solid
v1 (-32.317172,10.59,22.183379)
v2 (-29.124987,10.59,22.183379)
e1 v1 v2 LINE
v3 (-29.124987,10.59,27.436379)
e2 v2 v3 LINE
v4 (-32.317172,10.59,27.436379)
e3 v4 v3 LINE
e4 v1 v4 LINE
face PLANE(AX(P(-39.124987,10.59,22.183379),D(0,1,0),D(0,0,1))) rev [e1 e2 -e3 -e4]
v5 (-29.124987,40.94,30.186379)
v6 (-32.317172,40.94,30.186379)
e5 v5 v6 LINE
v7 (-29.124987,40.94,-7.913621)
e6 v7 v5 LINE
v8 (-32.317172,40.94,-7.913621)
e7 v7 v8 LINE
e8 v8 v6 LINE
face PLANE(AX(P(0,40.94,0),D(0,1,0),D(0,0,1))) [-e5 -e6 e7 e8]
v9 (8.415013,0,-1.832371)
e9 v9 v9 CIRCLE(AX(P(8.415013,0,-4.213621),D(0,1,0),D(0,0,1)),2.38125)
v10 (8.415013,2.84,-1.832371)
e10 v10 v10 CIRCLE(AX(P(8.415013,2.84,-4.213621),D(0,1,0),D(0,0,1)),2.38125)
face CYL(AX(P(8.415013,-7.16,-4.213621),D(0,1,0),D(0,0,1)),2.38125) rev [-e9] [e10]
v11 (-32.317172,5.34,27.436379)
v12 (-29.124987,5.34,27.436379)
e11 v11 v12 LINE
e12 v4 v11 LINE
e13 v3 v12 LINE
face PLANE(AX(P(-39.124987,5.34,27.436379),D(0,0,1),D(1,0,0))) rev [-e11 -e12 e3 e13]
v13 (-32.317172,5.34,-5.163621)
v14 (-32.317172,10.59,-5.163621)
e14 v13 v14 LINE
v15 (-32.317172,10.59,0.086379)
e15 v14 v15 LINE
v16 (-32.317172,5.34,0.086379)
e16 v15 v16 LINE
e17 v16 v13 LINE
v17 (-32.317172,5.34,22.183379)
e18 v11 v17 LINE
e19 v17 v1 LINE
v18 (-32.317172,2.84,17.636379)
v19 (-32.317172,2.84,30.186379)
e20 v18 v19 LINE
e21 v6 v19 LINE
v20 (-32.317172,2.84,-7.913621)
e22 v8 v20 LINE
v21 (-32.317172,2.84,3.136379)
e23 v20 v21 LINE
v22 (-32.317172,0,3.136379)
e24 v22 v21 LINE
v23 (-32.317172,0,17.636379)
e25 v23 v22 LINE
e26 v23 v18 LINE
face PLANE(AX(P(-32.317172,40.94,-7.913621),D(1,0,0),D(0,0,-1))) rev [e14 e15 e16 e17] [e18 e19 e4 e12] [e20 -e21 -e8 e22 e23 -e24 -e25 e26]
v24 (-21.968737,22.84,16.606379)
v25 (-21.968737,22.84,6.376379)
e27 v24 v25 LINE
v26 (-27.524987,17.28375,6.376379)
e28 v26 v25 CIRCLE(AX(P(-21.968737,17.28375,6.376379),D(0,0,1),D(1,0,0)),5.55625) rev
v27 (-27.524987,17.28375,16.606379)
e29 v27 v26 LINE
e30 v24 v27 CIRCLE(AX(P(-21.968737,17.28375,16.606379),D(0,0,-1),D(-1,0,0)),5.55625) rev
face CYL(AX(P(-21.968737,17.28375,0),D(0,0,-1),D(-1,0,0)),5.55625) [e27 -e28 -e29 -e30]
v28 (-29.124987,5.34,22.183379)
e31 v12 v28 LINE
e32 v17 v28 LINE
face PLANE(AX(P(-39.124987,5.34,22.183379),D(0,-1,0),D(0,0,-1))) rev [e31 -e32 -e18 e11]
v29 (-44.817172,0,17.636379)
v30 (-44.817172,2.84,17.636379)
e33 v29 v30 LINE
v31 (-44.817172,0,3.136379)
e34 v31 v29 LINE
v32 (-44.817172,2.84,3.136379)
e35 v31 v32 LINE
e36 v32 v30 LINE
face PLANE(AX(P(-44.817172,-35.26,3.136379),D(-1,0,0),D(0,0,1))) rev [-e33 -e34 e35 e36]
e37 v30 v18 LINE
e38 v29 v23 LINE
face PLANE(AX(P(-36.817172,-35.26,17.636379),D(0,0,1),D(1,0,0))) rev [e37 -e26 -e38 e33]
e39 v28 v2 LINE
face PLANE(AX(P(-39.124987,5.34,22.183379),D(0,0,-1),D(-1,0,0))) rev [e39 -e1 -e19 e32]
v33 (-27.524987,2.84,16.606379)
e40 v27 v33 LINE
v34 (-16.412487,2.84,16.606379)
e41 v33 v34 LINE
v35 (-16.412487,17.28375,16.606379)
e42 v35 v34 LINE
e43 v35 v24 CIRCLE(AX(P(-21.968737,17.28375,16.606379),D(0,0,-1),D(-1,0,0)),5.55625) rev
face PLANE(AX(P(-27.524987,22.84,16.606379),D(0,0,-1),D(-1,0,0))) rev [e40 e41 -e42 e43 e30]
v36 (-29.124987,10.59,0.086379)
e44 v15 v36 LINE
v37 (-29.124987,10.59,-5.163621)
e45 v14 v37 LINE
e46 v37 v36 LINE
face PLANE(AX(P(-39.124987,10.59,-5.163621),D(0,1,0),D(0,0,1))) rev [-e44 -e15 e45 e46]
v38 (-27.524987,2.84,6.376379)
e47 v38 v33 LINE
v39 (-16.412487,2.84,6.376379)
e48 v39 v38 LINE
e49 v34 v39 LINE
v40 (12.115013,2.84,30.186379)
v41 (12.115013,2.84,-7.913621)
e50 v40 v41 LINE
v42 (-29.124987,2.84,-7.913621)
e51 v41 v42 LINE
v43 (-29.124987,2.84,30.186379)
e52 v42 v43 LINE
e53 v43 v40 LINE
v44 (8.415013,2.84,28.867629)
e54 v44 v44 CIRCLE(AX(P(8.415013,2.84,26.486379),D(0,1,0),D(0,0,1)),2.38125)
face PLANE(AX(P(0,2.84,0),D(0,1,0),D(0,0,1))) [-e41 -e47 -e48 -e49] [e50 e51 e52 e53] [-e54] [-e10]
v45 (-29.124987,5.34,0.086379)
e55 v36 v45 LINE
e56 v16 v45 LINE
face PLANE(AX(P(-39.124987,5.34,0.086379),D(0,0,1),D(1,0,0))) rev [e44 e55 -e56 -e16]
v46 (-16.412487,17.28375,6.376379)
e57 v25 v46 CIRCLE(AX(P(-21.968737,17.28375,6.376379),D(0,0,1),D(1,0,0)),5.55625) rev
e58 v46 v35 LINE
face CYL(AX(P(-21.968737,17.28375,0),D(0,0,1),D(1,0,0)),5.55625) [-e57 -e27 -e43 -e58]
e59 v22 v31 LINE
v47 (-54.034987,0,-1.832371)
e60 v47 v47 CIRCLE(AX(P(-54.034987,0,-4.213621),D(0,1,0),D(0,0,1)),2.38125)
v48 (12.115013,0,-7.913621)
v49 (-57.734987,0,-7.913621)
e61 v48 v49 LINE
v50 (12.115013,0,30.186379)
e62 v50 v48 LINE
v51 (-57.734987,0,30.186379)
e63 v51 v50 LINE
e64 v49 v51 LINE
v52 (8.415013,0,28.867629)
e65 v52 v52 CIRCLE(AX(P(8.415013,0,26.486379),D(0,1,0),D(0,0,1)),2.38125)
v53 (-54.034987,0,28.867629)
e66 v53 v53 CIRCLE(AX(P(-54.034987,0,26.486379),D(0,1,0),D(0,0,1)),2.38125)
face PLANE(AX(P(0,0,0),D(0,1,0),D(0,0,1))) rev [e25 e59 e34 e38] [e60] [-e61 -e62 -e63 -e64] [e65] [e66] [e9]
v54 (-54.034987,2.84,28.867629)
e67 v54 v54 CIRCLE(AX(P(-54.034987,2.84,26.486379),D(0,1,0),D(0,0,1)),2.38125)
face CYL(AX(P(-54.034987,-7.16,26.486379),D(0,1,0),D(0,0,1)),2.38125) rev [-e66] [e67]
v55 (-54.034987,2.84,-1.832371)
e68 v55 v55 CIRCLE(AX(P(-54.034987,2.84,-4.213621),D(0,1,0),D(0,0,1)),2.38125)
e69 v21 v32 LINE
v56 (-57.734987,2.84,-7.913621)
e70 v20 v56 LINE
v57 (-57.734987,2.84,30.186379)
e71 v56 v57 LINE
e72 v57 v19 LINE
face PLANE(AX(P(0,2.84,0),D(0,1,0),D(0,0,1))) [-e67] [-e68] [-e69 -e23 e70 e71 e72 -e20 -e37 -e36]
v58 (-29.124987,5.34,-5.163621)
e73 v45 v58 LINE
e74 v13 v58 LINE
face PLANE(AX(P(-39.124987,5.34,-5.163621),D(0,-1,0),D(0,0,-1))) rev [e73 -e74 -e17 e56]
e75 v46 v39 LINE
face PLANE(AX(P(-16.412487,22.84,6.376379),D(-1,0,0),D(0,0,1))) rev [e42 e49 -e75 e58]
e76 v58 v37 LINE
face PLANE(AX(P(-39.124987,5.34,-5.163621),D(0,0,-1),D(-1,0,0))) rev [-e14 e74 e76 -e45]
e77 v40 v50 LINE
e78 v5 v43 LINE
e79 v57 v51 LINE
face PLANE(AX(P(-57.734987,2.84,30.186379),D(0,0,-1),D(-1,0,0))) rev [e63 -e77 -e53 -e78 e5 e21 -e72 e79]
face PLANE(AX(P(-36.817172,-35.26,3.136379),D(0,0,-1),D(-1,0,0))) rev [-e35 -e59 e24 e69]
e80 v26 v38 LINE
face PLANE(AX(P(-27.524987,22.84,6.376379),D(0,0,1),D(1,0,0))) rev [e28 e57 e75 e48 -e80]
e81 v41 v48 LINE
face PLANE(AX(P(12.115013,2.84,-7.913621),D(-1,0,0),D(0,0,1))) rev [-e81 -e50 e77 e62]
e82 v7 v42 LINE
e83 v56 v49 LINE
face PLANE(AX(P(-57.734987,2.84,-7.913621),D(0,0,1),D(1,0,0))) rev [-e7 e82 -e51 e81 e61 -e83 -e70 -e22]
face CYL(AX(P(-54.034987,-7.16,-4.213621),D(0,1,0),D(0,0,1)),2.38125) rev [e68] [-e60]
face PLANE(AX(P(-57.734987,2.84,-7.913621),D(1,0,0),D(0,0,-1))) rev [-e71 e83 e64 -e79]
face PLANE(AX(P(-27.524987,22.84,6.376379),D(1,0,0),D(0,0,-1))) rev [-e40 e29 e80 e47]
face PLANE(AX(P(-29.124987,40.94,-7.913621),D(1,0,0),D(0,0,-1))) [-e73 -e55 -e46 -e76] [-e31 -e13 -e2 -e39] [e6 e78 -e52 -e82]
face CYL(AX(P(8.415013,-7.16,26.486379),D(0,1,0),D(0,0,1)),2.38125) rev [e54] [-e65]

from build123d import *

# Parameters (mm, degrees)
SKETCH1_W           = 69.85
SKETCH1_H           = 38.1
BOSS_EXTRUDE1_DEPTH = 2.84
SKETCH2_W           = 11.1125
SKETCH2_H           = 10.23
BOSS_EXTRUDE5_DEPTH = 20
SKETCH4_W           = 3.192184281
SKETCH4_H           = 38.1
BOSS_EXTRUDE7_DEPTH = 38.1
FILLET1_R           = 5.55625
FILLET2_R           = 5.55625
SKETCH5_W           = 8
SKETCH5_H           = 14.5
CUT_EXTRUDE1_DEPTH  = 38.1
SKETCH6_W           = 5.25
SKETCH6_H           = 5.25
CUT_EXTRUDE2_DEPTH  = 10
SKETCH7_W           = 5.253
SKETCH7_H           = 5.25
CUT_EXTRUDE3_DEPTH  = 10
SKETCH8_R           = 2.38125
CUT_EXTRUDE4_DEPTH  = 10
SKETCH9_R           = 2.38125
CUT_EXTRUDE5_DEPTH  = 10
SKETCH10_W          = 4.5
SKETCH10_H          = 14.5
CUT_EXTRUDE6_DEPTH  = 10
SKETCH12_R          = 2.38125
CUT_EXTRUDE7_DEPTH  = 10
SKETCH13_R          = 2.38125
CUT_EXTRUDE8_DEPTH  = 10


with BuildPart() as part:
    # Sketch1 → Boss-Extrude1 (new body)
    with BuildSketch(Plane(origin=(0, 0, 0), x_dir=(1, 0, 0), z_dir=(0, 1, 0))):
        with Locations((-22.809987281, -11.136378688)):
            Rectangle(SKETCH1_W, SKETCH1_H)
    extrude(amount=BOSS_EXTRUDE1_DEPTH)

    # Sketch2 → Boss-Extrude5 (add)
    with BuildSketch(Plane(origin=(0, 2.84, 0), x_dir=(1, 0, 0), z_dir=(0, 1, 0))):
        with Locations((-21.968737281, -11.491378688)):
            Rectangle(SKETCH2_W, SKETCH2_H)
    extrude(amount=BOSS_EXTRUDE5_DEPTH)

    # Sketch4 → Boss-Extrude7 (add)
    with BuildSketch(Plane(origin=(0, 2.84, 0), x_dir=(1, 0, 0), z_dir=(0, 1, 0))):
        with Locations((-30.721079422, -11.136378688)):
            Rectangle(SKETCH4_W, SKETCH4_H)
    extrude(amount=BOSS_EXTRUDE7_DEPTH)

    # Fillet1
    fillet1_edges = [part.edges().sort_by_distance(p)[0] for p in [
        (-16.412487281, 22.84, 11.491378688),
    ]]
    fillet(fillet1_edges, radius=FILLET1_R)

    # Fillet2
    fillet2_edges = [part.edges().sort_by_distance(p)[0] for p in [
        (-27.524987281, 22.84, 11.491378688),
    ]]
    fillet(fillet2_edges, radius=FILLET2_R - 0.0001)  # a hair under: the kernel refuses the full size

    # Sketch5 → Cut-Extrude1 (cut)
    with BuildSketch(Plane(origin=(0, 2.84, 0), x_dir=(1, 0, 0), z_dir=(0, 1, 0))):
        with Locations((-40.817171562, -10.386378688)):
            Rectangle(SKETCH5_W, SKETCH5_H)
    extrude(amount=-CUT_EXTRUDE1_DEPTH, mode=Mode.SUBTRACT)

    # Sketch6 → Cut-Extrude2 (cut)
    with BuildSketch(Plane(origin=(-29.124987281, 0, 0), x_dir=(0, 0, -1), z_dir=(1, 0, 0))):
        with Locations((2.538621312, 7.965)):
            Rectangle(SKETCH6_W, SKETCH6_H)
    extrude(amount=-CUT_EXTRUDE2_DEPTH, mode=Mode.SUBTRACT)

    # Sketch7 → Cut-Extrude3 (cut)
    with BuildSketch(Plane(origin=(-29.124987281, 0, 0), x_dir=(0, 0, -1), z_dir=(1, 0, 0))):
        with Locations((-24.809878688, 7.965)):
            Rectangle(SKETCH7_W, SKETCH7_H)
    extrude(amount=-CUT_EXTRUDE3_DEPTH, mode=Mode.SUBTRACT)

    # Sketch8 → Cut-Extrude4 (cut)
    with BuildSketch(Plane(origin=(0, 2.84, 0), x_dir=(1, 0, 0), z_dir=(0, 1, 0))):
        with Locations(Location((8.415012719, 4.213621312, 0), (0, 0, 270))):
            Circle(SKETCH8_R)
    extrude(amount=-CUT_EXTRUDE4_DEPTH, mode=Mode.SUBTRACT)

    # Sketch9 → Cut-Extrude5 (cut)
    with BuildSketch(Plane(origin=(0, 2.84, 0), x_dir=(1, 0, 0), z_dir=(0, 1, 0))):
        with Locations(Location((8.415012719, -26.486378688, 0), (0, 0, 270))):
            Circle(SKETCH9_R)
    extrude(amount=-CUT_EXTRUDE5_DEPTH, mode=Mode.SUBTRACT)

    # Sketch10 → Cut-Extrude6 (cut)
    with BuildSketch(Plane(origin=(0, 2.84, 0), x_dir=(1, 0, 0), z_dir=(0, 1, 0))):
        with Locations((-34.567171562, -10.386378688)):
            Rectangle(SKETCH10_W, SKETCH10_H)
    extrude(amount=-CUT_EXTRUDE6_DEPTH, mode=Mode.SUBTRACT)

    # Sketch12 → Cut-Extrude7 (cut)
    with BuildSketch(Plane(origin=(0, 2.84, 0), x_dir=(1, 0, 0), z_dir=(0, 1, 0))):
        with Locations(Location((-54.034987281, -26.486378688, 0), (0, 0, 270))):
            Circle(SKETCH12_R)
    extrude(amount=-CUT_EXTRUDE7_DEPTH, mode=Mode.SUBTRACT)

    # Sketch13 → Cut-Extrude8 (cut)
    with BuildSketch(Plane(origin=(0, 2.84, 0), x_dir=(1, 0, 0), z_dir=(0, 1, 0))):
        with Locations(Location((-54.034987281, 4.213621312, 0), (0, 0, 270))):
            Circle(SKETCH13_R)
    extrude(amount=-CUT_EXTRUDE8_DEPTH, mode=Mode.SUBTRACT)


solid = part.part
